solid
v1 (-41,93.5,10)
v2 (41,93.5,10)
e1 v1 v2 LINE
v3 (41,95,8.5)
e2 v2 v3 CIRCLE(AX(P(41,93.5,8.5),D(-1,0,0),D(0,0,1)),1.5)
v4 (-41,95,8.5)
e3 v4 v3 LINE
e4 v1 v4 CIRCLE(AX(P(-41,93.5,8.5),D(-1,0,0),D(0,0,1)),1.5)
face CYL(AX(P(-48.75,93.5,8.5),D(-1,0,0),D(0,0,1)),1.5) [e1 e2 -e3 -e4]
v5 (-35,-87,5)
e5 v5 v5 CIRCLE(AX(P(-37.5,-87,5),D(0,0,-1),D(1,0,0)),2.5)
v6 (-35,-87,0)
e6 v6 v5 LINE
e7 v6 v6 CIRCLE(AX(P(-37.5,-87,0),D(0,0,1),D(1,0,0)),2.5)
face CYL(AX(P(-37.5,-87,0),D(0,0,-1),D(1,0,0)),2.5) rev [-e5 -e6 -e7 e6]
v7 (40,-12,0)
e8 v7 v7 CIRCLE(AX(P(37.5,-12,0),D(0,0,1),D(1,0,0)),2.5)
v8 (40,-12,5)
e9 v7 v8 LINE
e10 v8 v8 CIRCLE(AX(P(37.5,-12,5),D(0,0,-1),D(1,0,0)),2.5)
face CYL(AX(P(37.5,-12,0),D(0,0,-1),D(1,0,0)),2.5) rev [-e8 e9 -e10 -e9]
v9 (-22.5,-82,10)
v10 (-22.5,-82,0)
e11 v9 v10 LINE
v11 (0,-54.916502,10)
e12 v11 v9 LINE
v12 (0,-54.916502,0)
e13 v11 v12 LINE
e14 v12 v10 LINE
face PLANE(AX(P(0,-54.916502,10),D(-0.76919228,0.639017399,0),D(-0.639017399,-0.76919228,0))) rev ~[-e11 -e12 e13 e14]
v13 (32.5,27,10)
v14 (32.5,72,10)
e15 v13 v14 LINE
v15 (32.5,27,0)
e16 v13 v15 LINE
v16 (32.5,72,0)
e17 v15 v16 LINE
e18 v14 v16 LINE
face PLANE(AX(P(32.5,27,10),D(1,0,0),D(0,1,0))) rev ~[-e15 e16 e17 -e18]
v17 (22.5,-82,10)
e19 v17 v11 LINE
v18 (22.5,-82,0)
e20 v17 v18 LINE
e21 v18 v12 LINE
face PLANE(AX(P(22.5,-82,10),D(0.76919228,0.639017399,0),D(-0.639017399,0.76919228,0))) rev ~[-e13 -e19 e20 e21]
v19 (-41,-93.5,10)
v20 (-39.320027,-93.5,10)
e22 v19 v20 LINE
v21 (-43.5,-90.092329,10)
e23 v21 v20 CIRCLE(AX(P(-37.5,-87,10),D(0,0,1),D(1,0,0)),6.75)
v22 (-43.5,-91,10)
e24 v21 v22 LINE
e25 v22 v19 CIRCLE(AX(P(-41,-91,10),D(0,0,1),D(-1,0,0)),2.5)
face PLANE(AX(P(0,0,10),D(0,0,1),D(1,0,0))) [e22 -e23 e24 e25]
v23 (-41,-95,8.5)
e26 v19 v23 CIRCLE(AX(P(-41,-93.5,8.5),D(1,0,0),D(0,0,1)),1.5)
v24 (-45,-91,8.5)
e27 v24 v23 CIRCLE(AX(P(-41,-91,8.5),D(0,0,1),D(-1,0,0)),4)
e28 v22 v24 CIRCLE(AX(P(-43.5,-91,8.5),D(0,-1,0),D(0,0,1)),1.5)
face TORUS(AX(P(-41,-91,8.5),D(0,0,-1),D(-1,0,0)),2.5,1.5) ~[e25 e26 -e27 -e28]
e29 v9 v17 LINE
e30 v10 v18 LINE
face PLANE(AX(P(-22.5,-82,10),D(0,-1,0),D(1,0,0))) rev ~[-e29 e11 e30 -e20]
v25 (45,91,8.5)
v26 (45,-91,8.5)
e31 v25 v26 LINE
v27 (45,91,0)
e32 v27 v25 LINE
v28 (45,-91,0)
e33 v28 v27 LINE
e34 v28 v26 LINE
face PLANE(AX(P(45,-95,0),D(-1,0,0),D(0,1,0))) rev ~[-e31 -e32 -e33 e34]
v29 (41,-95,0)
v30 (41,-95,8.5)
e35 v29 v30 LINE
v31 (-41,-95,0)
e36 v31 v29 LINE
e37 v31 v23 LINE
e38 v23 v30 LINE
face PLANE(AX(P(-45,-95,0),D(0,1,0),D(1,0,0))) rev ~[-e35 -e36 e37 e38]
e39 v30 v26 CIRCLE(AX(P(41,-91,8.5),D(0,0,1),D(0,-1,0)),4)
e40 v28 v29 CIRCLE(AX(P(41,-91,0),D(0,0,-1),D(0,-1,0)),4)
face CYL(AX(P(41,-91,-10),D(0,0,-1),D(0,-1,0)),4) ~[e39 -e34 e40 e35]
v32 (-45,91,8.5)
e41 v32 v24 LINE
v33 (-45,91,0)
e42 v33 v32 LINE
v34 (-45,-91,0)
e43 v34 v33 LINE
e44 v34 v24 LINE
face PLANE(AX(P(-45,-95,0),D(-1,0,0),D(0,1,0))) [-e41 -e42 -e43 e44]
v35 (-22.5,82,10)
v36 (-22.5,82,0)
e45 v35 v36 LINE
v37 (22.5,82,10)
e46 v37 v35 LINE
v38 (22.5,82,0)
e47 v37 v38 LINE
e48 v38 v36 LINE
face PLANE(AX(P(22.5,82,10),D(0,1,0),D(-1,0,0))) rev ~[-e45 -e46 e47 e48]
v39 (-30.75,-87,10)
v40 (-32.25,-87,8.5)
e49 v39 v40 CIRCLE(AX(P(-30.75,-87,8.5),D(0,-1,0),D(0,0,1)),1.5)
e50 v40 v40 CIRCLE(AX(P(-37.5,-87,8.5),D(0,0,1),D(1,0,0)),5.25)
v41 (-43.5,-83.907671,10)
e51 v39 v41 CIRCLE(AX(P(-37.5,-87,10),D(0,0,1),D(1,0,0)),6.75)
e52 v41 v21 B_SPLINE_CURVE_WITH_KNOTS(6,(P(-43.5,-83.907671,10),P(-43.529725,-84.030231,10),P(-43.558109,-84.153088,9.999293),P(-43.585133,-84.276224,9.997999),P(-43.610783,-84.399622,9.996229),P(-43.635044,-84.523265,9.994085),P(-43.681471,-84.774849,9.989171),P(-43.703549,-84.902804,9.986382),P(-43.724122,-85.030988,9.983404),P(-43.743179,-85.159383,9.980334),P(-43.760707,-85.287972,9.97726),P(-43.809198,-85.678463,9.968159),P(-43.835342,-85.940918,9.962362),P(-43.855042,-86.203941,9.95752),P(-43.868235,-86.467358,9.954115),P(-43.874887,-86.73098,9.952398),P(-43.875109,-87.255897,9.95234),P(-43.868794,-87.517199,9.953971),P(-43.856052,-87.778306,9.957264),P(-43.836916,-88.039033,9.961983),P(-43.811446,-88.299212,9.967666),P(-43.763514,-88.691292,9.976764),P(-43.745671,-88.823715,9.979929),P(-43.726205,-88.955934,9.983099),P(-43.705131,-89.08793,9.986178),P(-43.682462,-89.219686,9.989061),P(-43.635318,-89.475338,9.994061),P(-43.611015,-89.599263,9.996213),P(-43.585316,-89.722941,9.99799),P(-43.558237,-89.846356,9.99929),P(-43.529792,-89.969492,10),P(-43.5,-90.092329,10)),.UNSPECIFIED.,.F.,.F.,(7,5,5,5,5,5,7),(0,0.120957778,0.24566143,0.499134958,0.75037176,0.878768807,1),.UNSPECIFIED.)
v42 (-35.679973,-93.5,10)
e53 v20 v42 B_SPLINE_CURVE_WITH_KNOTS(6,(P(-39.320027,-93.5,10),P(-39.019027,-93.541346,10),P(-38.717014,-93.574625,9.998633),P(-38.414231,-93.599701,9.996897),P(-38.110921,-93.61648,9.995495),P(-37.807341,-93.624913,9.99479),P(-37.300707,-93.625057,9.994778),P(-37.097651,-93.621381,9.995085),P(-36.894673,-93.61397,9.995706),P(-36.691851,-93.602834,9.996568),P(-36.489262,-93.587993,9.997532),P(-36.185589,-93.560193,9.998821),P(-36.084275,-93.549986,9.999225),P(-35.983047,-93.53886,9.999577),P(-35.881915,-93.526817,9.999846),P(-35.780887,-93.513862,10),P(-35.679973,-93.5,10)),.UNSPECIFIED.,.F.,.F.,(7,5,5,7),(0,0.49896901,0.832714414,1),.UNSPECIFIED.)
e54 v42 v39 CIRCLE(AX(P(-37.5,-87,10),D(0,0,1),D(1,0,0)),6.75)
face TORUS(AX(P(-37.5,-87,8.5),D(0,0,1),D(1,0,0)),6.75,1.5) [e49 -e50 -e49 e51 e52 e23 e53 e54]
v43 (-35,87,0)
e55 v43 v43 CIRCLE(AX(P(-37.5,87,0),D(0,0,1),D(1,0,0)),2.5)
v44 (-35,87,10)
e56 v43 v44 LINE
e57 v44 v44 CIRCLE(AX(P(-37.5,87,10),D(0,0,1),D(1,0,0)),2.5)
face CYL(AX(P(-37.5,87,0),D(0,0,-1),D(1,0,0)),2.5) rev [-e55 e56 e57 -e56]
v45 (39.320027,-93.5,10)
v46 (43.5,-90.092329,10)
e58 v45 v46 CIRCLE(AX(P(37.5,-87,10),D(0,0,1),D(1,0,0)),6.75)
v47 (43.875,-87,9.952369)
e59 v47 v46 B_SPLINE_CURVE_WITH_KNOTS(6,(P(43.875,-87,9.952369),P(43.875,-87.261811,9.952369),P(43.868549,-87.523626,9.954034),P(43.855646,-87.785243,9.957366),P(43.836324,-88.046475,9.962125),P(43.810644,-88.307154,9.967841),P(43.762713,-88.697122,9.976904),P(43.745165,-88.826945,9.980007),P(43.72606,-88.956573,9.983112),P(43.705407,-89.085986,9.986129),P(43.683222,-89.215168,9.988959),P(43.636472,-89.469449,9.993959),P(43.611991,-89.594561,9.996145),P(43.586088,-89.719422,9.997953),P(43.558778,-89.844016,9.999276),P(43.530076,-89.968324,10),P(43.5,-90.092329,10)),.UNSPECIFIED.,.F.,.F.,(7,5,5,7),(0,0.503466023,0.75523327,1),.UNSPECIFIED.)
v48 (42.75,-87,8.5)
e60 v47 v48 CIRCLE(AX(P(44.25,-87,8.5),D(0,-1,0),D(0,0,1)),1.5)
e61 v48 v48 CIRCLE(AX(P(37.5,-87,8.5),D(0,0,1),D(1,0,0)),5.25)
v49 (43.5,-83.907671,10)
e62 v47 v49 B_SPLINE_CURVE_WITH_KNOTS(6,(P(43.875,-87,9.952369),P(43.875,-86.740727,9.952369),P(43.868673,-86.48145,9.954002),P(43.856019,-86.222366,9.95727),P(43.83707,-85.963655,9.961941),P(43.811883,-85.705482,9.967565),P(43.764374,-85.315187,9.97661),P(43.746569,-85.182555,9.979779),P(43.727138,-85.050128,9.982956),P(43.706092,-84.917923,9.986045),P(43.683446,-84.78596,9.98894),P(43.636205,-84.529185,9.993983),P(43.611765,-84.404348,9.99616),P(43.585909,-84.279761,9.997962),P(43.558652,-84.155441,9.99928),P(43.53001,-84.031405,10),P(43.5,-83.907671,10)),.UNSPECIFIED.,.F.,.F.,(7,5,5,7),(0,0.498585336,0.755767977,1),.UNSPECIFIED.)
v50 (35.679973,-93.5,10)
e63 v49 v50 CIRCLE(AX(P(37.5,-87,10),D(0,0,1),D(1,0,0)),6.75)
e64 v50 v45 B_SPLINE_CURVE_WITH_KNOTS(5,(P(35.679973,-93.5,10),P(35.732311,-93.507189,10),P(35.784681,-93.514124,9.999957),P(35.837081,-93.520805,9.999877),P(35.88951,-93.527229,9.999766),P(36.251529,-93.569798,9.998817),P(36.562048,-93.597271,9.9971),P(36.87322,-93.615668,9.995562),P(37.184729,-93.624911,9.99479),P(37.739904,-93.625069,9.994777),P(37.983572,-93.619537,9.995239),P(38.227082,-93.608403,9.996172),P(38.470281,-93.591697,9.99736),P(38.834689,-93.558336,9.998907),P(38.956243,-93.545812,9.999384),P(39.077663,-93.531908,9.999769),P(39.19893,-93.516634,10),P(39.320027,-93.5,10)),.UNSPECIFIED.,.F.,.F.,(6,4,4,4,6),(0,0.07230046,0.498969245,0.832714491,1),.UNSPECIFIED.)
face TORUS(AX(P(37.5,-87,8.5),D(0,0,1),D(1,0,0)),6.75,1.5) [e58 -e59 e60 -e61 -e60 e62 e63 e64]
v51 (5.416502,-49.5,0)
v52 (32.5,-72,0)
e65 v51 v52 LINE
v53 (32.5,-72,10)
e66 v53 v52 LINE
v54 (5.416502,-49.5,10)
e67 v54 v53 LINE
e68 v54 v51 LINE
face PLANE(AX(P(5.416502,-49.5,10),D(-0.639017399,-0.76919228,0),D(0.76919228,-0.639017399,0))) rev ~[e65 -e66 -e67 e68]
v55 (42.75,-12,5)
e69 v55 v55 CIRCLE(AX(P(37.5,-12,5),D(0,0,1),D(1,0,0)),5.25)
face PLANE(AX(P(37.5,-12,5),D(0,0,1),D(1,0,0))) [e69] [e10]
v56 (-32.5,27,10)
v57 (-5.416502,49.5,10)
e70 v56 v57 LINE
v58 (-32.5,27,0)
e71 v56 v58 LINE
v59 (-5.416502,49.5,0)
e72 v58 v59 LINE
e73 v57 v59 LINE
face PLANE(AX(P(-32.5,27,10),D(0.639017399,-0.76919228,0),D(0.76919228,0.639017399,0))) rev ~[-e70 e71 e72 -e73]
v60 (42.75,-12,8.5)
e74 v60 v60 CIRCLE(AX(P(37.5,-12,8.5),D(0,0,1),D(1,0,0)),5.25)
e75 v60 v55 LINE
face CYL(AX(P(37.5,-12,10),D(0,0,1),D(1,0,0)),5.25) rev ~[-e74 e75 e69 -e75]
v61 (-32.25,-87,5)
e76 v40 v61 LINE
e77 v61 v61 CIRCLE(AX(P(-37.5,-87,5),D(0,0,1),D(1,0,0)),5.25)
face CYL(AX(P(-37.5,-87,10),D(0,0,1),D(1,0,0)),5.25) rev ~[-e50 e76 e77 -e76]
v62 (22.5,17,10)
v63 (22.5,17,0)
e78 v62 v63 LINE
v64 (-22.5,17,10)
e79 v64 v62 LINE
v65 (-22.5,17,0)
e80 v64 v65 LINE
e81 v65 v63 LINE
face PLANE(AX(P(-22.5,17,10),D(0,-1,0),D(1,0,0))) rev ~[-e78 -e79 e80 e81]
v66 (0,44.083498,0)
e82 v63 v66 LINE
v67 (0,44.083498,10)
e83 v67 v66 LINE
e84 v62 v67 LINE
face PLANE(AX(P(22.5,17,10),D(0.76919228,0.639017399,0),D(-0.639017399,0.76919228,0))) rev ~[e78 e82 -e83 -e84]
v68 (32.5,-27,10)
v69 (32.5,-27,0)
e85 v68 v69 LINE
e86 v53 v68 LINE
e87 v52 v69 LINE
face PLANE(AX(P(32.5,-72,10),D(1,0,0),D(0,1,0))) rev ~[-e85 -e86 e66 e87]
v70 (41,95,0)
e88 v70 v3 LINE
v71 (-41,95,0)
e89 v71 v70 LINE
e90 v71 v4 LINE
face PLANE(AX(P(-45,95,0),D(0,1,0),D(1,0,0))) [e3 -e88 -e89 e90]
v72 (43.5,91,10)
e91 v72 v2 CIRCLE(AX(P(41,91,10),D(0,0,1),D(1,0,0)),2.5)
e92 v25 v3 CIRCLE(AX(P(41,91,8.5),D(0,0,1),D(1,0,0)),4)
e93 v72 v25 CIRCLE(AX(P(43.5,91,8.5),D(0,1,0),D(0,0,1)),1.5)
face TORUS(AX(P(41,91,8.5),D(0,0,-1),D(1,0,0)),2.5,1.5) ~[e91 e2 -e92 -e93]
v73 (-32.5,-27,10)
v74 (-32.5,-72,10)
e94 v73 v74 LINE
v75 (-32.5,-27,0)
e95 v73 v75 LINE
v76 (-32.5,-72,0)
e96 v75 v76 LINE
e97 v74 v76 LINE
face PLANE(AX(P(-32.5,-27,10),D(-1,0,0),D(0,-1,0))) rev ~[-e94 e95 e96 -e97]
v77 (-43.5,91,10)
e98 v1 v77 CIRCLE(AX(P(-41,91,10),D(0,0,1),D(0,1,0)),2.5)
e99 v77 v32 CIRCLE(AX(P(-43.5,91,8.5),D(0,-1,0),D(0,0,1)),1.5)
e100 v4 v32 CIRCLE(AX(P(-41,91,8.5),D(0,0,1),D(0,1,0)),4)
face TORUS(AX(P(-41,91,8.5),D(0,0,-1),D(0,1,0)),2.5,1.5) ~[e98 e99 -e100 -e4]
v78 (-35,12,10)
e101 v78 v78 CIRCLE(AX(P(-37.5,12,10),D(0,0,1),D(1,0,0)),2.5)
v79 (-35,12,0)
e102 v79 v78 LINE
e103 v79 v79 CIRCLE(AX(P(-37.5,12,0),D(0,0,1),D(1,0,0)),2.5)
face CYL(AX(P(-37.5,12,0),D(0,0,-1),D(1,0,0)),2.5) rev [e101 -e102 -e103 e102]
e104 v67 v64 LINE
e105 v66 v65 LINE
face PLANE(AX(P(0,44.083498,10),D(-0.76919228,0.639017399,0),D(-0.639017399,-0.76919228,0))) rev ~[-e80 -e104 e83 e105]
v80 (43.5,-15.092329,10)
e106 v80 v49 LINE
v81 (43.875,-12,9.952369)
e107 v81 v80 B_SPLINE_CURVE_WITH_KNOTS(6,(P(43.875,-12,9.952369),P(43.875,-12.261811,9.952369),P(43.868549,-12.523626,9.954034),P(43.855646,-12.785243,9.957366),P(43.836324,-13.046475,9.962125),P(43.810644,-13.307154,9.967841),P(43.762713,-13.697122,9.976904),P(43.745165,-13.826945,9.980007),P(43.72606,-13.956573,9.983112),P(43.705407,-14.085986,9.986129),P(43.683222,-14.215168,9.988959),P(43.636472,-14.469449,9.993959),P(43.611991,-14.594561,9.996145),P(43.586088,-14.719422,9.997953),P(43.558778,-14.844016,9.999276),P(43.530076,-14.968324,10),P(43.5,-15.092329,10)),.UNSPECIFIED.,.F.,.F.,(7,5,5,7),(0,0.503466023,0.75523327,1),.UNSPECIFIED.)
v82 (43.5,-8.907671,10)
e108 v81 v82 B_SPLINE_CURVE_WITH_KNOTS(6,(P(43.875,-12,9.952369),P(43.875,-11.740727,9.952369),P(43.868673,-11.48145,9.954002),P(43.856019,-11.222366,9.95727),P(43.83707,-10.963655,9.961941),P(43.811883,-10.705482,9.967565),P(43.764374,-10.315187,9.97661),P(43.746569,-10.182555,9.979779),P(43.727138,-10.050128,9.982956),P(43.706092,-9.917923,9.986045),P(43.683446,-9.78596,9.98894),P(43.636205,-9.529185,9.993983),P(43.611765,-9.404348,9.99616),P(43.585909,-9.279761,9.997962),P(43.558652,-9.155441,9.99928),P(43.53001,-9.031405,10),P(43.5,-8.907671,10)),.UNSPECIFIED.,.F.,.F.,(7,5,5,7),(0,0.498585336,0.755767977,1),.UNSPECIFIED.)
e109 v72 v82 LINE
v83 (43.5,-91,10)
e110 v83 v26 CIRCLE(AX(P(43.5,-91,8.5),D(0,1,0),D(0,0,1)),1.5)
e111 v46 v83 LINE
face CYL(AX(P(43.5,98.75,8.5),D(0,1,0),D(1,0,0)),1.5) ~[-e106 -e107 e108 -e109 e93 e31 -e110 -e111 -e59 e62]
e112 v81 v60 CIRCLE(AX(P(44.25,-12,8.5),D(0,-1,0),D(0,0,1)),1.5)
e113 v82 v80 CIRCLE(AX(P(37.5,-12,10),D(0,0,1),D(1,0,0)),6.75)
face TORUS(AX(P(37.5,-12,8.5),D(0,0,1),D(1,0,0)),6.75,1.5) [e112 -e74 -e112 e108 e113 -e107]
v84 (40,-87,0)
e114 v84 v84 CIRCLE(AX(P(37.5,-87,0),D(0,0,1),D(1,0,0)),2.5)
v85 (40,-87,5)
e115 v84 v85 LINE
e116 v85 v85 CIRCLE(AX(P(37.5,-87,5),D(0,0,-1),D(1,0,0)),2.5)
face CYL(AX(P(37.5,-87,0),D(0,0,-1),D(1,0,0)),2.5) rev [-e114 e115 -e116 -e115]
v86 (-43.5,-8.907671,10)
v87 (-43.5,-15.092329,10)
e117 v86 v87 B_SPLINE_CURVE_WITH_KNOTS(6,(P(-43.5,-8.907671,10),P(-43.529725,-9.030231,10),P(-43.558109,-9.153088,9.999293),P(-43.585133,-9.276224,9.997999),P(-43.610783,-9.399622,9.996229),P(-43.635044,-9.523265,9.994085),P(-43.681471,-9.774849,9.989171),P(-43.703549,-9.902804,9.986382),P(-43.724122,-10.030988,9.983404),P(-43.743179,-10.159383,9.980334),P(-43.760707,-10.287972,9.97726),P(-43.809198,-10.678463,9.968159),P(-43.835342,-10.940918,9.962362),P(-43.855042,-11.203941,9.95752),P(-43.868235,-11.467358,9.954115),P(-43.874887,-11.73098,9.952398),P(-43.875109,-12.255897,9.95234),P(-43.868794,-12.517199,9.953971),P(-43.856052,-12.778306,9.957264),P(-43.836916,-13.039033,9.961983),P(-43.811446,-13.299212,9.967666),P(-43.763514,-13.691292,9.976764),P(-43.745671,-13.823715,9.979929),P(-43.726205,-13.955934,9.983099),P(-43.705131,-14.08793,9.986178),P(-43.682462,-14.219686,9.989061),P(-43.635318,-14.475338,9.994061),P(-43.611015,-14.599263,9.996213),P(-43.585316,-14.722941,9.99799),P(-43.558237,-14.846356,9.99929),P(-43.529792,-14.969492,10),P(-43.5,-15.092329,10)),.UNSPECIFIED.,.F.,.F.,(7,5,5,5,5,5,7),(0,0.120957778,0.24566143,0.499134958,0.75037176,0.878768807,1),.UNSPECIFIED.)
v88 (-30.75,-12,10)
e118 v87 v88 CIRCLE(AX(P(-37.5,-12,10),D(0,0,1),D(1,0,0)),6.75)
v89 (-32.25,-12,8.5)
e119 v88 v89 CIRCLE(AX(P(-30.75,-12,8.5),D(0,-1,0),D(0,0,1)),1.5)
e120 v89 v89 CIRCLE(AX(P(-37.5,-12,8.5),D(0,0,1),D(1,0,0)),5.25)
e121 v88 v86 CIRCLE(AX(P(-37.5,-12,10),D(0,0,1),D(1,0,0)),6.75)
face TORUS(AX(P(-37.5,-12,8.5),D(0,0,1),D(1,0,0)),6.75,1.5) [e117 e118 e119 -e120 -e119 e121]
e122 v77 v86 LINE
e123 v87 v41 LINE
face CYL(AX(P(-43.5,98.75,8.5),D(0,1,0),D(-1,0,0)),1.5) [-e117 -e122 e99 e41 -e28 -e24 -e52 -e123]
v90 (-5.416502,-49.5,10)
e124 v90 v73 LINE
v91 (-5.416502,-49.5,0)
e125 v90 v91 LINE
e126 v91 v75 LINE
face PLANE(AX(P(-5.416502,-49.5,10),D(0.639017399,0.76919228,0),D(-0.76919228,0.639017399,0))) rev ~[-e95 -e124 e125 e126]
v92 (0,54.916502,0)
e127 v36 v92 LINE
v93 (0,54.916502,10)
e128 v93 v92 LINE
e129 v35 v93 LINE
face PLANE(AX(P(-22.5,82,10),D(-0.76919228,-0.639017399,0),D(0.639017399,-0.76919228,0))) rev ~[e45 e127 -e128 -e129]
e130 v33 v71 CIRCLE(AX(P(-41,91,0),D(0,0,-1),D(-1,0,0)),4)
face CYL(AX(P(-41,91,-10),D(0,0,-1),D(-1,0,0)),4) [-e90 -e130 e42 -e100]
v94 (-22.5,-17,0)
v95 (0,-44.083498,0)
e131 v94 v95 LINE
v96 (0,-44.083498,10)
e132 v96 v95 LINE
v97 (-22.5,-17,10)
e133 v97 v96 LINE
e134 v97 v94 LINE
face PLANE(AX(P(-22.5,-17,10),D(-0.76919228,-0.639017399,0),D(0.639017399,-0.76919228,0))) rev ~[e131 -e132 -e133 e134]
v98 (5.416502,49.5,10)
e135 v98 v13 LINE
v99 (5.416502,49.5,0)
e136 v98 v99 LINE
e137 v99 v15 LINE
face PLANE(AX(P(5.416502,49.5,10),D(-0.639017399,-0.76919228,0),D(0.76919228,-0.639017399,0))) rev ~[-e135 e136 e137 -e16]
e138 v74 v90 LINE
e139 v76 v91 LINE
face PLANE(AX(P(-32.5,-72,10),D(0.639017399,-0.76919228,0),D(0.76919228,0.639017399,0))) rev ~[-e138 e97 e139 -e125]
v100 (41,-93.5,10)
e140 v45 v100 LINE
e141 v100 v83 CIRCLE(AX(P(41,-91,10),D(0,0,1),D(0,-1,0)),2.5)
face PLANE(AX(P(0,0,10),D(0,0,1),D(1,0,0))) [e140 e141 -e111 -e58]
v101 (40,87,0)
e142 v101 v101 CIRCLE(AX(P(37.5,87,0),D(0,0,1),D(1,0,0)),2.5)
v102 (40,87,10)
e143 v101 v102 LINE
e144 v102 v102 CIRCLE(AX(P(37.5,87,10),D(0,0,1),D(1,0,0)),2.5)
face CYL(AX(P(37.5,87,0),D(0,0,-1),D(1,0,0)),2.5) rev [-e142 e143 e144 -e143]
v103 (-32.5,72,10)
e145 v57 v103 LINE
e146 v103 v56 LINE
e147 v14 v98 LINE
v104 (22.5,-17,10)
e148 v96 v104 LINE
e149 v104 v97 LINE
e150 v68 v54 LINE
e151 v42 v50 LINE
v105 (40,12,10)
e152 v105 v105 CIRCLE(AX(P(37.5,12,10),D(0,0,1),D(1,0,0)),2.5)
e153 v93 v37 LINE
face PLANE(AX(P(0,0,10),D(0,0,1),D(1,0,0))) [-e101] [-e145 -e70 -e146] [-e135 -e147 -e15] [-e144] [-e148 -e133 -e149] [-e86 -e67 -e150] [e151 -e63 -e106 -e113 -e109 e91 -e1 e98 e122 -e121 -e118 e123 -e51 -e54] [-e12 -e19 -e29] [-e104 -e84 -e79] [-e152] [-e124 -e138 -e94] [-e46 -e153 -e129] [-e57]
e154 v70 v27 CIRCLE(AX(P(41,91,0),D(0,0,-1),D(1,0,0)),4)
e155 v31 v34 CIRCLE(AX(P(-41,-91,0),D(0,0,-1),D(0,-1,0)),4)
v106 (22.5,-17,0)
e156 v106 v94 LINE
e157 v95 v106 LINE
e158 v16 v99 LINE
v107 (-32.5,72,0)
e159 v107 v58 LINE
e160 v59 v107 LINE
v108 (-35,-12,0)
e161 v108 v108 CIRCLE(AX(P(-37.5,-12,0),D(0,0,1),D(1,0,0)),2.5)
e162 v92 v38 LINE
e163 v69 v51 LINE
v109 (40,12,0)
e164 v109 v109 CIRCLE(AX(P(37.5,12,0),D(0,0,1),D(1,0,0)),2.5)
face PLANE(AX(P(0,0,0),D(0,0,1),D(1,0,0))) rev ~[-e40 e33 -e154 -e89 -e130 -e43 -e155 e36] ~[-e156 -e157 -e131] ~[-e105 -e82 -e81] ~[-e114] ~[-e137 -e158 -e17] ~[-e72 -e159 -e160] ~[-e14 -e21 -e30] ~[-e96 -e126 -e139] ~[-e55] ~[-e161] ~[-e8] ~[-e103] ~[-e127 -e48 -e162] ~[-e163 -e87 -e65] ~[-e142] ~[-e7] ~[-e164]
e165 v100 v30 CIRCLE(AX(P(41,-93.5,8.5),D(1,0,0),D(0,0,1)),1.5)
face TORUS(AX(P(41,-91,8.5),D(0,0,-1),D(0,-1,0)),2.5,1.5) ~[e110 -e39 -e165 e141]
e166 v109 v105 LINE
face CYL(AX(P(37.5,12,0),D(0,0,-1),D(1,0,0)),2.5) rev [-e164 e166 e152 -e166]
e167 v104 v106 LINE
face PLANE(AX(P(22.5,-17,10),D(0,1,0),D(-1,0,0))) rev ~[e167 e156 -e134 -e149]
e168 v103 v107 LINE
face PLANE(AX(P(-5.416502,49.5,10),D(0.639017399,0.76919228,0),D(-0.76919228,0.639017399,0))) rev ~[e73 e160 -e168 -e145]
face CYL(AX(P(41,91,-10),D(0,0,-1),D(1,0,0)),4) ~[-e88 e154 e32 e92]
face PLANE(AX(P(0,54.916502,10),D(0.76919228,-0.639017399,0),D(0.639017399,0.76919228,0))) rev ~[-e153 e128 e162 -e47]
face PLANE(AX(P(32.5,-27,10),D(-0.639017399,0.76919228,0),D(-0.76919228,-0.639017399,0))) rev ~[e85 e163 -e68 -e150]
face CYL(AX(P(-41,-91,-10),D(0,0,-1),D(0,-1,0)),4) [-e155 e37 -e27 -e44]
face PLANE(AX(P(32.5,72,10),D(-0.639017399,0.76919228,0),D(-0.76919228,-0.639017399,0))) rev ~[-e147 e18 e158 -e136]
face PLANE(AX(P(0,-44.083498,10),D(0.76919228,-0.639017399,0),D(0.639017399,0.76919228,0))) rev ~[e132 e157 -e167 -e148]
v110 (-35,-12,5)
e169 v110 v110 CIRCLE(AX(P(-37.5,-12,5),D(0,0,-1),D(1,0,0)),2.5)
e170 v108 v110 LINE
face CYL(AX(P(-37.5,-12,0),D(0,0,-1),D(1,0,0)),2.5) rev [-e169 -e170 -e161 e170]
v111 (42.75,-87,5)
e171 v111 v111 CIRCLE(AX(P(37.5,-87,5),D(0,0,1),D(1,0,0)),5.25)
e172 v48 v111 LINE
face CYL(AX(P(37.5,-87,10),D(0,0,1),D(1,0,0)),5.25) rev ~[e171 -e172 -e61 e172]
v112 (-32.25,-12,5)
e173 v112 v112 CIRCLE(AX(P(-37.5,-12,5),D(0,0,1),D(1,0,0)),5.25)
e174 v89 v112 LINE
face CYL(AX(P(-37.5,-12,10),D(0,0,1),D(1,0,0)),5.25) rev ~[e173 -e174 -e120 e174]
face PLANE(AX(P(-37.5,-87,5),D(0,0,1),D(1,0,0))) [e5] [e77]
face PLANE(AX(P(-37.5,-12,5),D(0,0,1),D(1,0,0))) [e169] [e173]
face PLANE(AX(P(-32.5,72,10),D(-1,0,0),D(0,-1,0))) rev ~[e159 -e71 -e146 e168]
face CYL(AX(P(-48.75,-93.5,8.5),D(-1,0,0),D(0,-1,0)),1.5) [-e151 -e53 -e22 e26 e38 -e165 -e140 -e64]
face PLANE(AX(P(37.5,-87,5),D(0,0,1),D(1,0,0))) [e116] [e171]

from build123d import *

# Parameters (mm, degrees)
F0_W         = 90
F0_H         = 190
F0_R         = 2.5
F1_DEPTH     = 10
F2_R         = 5.25
F3_DEPTH     = 5
F4_T1_DEPTH  = 197.5
F4_T3_DEPTH  = 97.5
F5_T1_DEPTH  = 19.9999999999
F5_T4_ANGLE  = 90
F5_T6_ANGLE  = 90
F5_T8_ANGLE  = 90
F5_T10_ANGLE = 90
F7_DEPTH     = 10


# Not quite as in the source:
# - a fillet or chamfer that OpenCascade refuses, or shapes differently, is made with other operations: its cross-section is extruded or revolved along the edge and cut away or added


with BuildPart() as f1:
    # F0 (on Top) → F1 (new body)
    with BuildSketch(Plane.XY):
        Rectangle(F0_W, F0_H)
        with Locations((-37.5, -87)):
            Circle(F0_R, mode=Mode.SUBTRACT)
        with Locations((-37.5, -12)):
            Circle(F0_R, mode=Mode.SUBTRACT)
        with Locations((37.5, -87)):
            Circle(F0_R, mode=Mode.SUBTRACT)
        with Locations((37.5, -12)):
            Circle(F0_R, mode=Mode.SUBTRACT)
        with Locations((-37.5, 12)):
            Circle(F0_R, mode=Mode.SUBTRACT)
        with Locations((-37.5, 87)):
            Circle(F0_R, mode=Mode.SUBTRACT)
        with Locations((37.5, 12)):
            Circle(F0_R, mode=Mode.SUBTRACT)
        with Locations((37.5, 87)):
            Circle(F0_R, mode=Mode.SUBTRACT)
    extrude(amount=F1_DEPTH)

    # F2 (on face) → F3 (cut)
    with BuildSketch(Plane.XY.offset(10)):
        with Locations((-37.5, -12)):
            Circle(F2_R)
        with Locations((-37.5, -87)):
            Circle(F2_R)
        with Locations((37.5, -12)):
            Circle(F2_R)
        with Locations((37.5, -87)):
            Circle(F2_R)
    extrude(amount=-F3_DEPTH, mode=Mode.SUBTRACT)

    # F4: fillet of radius 1.5 on 8 edges, made by hand

    # F4_s2 → F4_t1 (cut)
    with BuildSketch(Plane.XZ.offset(-98.75)):
        with BuildLine():
            ThreePointArc((-45, 8.5), (-44.5606601718, 9.5606601718), (-43.5, 10))
            Line((-43.5, 10), (-45, 10))
            Line((-45, 10), (-45, 8.5))
        make_face()
        with BuildLine():
            ThreePointArc((45, 8.5), (44.5606601718, 9.5606601718), (43.5, 10))
            Line((43.5, 10), (45, 10))
            Line((45, 10), (45, 8.5))
        make_face()
    extrude(amount=F4_T1_DEPTH, mode=Mode.SUBTRACT)

    # F4_s4 → F4_t3 (cut)
    with BuildSketch(Plane.YZ.offset(-48.75)):
        with BuildLine():
            ThreePointArc((93.5, 10), (94.5606601718, 9.5606601718), (95, 8.5))
            Line((95, 8.5), (95, 10))
            Line((95, 10), (93.5, 10))
        make_face()
        with BuildLine():
            ThreePointArc((-95, 8.5), (-94.5606601718, 9.5606601718), (-93.5, 10))
            Line((-93.5, 10), (-95, 10))
            Line((-95, 10), (-95, 8.5))
        make_face()
    extrude(amount=F4_T3_DEPTH, mode=Mode.SUBTRACT)

    # F4_s5 → F4_t6 (revolve, cut)
    with BuildSketch(Plane.XZ.offset(87)):
        with BuildLine():
            ThreePointArc((-30.75, 10), (-31.8106601718, 9.5606601718), (-32.25, 8.5))
            Line((-32.25, 8.5), (-32.25, 10))
            Line((-32.25, 10), (-30.75, 10))
        make_face()
    revolve(axis=Axis((-37.5, -87, 10), (0, 0, 1)), mode=Mode.SUBTRACT)

    # F4_s7 → F4_t8 (revolve, cut)
    with BuildSketch(Plane.XZ.offset(12)):
        with BuildLine():
            ThreePointArc((-30.75, 10), (-31.8106601718, 9.5606601718), (-32.25, 8.5))
            Line((-32.25, 8.5), (-32.25, 10))
            Line((-32.25, 10), (-30.75, 10))
        make_face()
    revolve(axis=Axis((-37.5, -12, 10), (0, 0, 1)), mode=Mode.SUBTRACT)

    # F4_s9 → F4_t10 (revolve, cut)
    with BuildSketch(Plane.XZ.offset(12)):
        with BuildLine():
            ThreePointArc((44.25, 10), (43.1893398282, 9.5606601718), (42.75, 8.5))
            Line((42.75, 8.5), (42.75, 10))
            Line((42.75, 10), (44.25, 10))
        make_face()
    revolve(axis=Axis((37.5, -12, 10), (0, 0, 1)), mode=Mode.SUBTRACT)

    # F4_s11 → F4_t12 (revolve, cut)
    with BuildSketch(Plane.XZ.offset(87)):
        with BuildLine():
            ThreePointArc((44.25, 10), (43.1893398282, 9.5606601718), (42.75, 8.5))
            Line((42.75, 8.5), (42.75, 10))
            Line((42.75, 10), (44.25, 10))
        make_face()
    revolve(axis=Axis((37.5, -87, 10), (0, 0, 1)), mode=Mode.SUBTRACT)

    # F5: fillet of radius 4 on 4 edges, made by hand

    # F5_s2 → F5_t1 (cut)
    with BuildSketch(Plane.XY.offset(-10)):
        with BuildLine():
            ThreePointArc((-41, -95), (-43.8284271247, -93.8284271247), (-45, -91))
            Line((-45, -91), (-45, -95))
            Line((-45, -95), (-41, -95))
        make_face()
        with BuildLine():
            ThreePointArc((41, -95), (43.8284271247, -93.8284271247), (45, -91))
            Line((45, -91), (45, -95))
            Line((45, -95), (41, -95))
        make_face()
        with BuildLine():
            ThreePointArc((45, 91), (43.8284271247, 93.8284271247), (41, 95))
            Line((41, 95), (45, 95))
            Line((45, 95), (45, 91))
        make_face()
        with BuildLine():
            ThreePointArc((-45, 91), (-43.8284271247, 93.8284271247), (-41, 95))
            Line((-41, 95), (-45, 95))
            Line((-45, 95), (-45, 91))
        make_face()
    extrude(amount=F5_T1_DEPTH, mode=Mode.SUBTRACT)

    # F5_s3 → F5_t4 (revolve, cut)
    with BuildSketch(Plane.YZ.offset(-41)):
        with BuildLine():
            ThreePointArc((93.5000000001, 10), (94.5606601718, 9.5606601718), (95, 8.5000000001))
            Line((95, 8.5000000001), (95, 10))
            Line((95, 10), (93.5000000001, 10))
        make_face()
    revolve(axis=Axis((-41, 91, 10), (0, 0, 1)), revolution_arc=F5_T4_ANGLE, mode=Mode.SUBTRACT)

    # F5_s5 → F5_t6 (revolve, cut)
    with BuildSketch(Plane.XZ.offset(-91)):
        with BuildLine():
            ThreePointArc((43.5000000001, 10), (44.5606601718, 9.5606601718), (45, 8.5000000001))
            Line((45, 8.5000000001), (45, 10))
            Line((45, 10), (43.5000000001, 10))
        make_face()
    revolve(axis=Axis((41, 91, 10), (0, 0, 1)), revolution_arc=F5_T6_ANGLE, mode=Mode.SUBTRACT)

    # F5_s7 → F5_t8 (revolve, cut)
    with BuildSketch(Plane.YZ.offset(41)):
        with BuildLine():
            ThreePointArc((-93.5000000001, 10), (-94.5606601718, 9.5606601718), (-95, 8.5000000001))
            Line((-95, 8.5000000001), (-95, 10))
            Line((-95, 10), (-93.5000000001, 10))
        make_face()
    revolve(axis=Axis((41, -91, 10), (0, 0, 1)), revolution_arc=F5_T8_ANGLE, mode=Mode.SUBTRACT)

    # F5_s9 → F5_t10 (revolve, cut)
    with BuildSketch(Plane.XZ.offset(91)):
        with BuildLine():
            ThreePointArc((-43.5000000001, 10), (-44.5606601718, 9.5606601718), (-45, 8.5000000001))
            Line((-45, 8.5000000001), (-45, 10))
            Line((-45, 10), (-43.5000000001, 10))
        make_face()
    revolve(axis=Axis((-41, -91, 10), (0, 0, 1)), revolution_arc=F5_T10_ANGLE, mode=Mode.SUBTRACT)

    # F6 (on face) → F7 (cut, through all)
    with BuildSketch(Plane.XY.offset(10)):
        Polygon((0, -44.0834977552), (22.5, -17), (-22.5, -17), align=None)
        Polygon((-5.4165022448, -49.5), (-32.5, -27), (-32.5, -72), align=None)
        Polygon((0, -54.9165022448), (-22.5, -82), (22.5, -82), align=None)
        Polygon((5.4165022448, -49.5), (32.5, -72), (32.5, -27), align=None)
        Polygon((-22.5, 17), (22.5, 17), (0, 44.0834977552), align=None)
        Polygon((32.5, 27), (32.5, 72), (5.4165022448, 49.5), align=None)
        Polygon((22.5, 82), (-22.5, 82), (0, 54.9165022448), align=None)
        Polygon((-32.5, 72), (-32.5, 27), (-5.4165022448, 49.5), align=None)
    extrude(amount=-F7_DEPTH, mode=Mode.SUBTRACT)


solid = f1.part
